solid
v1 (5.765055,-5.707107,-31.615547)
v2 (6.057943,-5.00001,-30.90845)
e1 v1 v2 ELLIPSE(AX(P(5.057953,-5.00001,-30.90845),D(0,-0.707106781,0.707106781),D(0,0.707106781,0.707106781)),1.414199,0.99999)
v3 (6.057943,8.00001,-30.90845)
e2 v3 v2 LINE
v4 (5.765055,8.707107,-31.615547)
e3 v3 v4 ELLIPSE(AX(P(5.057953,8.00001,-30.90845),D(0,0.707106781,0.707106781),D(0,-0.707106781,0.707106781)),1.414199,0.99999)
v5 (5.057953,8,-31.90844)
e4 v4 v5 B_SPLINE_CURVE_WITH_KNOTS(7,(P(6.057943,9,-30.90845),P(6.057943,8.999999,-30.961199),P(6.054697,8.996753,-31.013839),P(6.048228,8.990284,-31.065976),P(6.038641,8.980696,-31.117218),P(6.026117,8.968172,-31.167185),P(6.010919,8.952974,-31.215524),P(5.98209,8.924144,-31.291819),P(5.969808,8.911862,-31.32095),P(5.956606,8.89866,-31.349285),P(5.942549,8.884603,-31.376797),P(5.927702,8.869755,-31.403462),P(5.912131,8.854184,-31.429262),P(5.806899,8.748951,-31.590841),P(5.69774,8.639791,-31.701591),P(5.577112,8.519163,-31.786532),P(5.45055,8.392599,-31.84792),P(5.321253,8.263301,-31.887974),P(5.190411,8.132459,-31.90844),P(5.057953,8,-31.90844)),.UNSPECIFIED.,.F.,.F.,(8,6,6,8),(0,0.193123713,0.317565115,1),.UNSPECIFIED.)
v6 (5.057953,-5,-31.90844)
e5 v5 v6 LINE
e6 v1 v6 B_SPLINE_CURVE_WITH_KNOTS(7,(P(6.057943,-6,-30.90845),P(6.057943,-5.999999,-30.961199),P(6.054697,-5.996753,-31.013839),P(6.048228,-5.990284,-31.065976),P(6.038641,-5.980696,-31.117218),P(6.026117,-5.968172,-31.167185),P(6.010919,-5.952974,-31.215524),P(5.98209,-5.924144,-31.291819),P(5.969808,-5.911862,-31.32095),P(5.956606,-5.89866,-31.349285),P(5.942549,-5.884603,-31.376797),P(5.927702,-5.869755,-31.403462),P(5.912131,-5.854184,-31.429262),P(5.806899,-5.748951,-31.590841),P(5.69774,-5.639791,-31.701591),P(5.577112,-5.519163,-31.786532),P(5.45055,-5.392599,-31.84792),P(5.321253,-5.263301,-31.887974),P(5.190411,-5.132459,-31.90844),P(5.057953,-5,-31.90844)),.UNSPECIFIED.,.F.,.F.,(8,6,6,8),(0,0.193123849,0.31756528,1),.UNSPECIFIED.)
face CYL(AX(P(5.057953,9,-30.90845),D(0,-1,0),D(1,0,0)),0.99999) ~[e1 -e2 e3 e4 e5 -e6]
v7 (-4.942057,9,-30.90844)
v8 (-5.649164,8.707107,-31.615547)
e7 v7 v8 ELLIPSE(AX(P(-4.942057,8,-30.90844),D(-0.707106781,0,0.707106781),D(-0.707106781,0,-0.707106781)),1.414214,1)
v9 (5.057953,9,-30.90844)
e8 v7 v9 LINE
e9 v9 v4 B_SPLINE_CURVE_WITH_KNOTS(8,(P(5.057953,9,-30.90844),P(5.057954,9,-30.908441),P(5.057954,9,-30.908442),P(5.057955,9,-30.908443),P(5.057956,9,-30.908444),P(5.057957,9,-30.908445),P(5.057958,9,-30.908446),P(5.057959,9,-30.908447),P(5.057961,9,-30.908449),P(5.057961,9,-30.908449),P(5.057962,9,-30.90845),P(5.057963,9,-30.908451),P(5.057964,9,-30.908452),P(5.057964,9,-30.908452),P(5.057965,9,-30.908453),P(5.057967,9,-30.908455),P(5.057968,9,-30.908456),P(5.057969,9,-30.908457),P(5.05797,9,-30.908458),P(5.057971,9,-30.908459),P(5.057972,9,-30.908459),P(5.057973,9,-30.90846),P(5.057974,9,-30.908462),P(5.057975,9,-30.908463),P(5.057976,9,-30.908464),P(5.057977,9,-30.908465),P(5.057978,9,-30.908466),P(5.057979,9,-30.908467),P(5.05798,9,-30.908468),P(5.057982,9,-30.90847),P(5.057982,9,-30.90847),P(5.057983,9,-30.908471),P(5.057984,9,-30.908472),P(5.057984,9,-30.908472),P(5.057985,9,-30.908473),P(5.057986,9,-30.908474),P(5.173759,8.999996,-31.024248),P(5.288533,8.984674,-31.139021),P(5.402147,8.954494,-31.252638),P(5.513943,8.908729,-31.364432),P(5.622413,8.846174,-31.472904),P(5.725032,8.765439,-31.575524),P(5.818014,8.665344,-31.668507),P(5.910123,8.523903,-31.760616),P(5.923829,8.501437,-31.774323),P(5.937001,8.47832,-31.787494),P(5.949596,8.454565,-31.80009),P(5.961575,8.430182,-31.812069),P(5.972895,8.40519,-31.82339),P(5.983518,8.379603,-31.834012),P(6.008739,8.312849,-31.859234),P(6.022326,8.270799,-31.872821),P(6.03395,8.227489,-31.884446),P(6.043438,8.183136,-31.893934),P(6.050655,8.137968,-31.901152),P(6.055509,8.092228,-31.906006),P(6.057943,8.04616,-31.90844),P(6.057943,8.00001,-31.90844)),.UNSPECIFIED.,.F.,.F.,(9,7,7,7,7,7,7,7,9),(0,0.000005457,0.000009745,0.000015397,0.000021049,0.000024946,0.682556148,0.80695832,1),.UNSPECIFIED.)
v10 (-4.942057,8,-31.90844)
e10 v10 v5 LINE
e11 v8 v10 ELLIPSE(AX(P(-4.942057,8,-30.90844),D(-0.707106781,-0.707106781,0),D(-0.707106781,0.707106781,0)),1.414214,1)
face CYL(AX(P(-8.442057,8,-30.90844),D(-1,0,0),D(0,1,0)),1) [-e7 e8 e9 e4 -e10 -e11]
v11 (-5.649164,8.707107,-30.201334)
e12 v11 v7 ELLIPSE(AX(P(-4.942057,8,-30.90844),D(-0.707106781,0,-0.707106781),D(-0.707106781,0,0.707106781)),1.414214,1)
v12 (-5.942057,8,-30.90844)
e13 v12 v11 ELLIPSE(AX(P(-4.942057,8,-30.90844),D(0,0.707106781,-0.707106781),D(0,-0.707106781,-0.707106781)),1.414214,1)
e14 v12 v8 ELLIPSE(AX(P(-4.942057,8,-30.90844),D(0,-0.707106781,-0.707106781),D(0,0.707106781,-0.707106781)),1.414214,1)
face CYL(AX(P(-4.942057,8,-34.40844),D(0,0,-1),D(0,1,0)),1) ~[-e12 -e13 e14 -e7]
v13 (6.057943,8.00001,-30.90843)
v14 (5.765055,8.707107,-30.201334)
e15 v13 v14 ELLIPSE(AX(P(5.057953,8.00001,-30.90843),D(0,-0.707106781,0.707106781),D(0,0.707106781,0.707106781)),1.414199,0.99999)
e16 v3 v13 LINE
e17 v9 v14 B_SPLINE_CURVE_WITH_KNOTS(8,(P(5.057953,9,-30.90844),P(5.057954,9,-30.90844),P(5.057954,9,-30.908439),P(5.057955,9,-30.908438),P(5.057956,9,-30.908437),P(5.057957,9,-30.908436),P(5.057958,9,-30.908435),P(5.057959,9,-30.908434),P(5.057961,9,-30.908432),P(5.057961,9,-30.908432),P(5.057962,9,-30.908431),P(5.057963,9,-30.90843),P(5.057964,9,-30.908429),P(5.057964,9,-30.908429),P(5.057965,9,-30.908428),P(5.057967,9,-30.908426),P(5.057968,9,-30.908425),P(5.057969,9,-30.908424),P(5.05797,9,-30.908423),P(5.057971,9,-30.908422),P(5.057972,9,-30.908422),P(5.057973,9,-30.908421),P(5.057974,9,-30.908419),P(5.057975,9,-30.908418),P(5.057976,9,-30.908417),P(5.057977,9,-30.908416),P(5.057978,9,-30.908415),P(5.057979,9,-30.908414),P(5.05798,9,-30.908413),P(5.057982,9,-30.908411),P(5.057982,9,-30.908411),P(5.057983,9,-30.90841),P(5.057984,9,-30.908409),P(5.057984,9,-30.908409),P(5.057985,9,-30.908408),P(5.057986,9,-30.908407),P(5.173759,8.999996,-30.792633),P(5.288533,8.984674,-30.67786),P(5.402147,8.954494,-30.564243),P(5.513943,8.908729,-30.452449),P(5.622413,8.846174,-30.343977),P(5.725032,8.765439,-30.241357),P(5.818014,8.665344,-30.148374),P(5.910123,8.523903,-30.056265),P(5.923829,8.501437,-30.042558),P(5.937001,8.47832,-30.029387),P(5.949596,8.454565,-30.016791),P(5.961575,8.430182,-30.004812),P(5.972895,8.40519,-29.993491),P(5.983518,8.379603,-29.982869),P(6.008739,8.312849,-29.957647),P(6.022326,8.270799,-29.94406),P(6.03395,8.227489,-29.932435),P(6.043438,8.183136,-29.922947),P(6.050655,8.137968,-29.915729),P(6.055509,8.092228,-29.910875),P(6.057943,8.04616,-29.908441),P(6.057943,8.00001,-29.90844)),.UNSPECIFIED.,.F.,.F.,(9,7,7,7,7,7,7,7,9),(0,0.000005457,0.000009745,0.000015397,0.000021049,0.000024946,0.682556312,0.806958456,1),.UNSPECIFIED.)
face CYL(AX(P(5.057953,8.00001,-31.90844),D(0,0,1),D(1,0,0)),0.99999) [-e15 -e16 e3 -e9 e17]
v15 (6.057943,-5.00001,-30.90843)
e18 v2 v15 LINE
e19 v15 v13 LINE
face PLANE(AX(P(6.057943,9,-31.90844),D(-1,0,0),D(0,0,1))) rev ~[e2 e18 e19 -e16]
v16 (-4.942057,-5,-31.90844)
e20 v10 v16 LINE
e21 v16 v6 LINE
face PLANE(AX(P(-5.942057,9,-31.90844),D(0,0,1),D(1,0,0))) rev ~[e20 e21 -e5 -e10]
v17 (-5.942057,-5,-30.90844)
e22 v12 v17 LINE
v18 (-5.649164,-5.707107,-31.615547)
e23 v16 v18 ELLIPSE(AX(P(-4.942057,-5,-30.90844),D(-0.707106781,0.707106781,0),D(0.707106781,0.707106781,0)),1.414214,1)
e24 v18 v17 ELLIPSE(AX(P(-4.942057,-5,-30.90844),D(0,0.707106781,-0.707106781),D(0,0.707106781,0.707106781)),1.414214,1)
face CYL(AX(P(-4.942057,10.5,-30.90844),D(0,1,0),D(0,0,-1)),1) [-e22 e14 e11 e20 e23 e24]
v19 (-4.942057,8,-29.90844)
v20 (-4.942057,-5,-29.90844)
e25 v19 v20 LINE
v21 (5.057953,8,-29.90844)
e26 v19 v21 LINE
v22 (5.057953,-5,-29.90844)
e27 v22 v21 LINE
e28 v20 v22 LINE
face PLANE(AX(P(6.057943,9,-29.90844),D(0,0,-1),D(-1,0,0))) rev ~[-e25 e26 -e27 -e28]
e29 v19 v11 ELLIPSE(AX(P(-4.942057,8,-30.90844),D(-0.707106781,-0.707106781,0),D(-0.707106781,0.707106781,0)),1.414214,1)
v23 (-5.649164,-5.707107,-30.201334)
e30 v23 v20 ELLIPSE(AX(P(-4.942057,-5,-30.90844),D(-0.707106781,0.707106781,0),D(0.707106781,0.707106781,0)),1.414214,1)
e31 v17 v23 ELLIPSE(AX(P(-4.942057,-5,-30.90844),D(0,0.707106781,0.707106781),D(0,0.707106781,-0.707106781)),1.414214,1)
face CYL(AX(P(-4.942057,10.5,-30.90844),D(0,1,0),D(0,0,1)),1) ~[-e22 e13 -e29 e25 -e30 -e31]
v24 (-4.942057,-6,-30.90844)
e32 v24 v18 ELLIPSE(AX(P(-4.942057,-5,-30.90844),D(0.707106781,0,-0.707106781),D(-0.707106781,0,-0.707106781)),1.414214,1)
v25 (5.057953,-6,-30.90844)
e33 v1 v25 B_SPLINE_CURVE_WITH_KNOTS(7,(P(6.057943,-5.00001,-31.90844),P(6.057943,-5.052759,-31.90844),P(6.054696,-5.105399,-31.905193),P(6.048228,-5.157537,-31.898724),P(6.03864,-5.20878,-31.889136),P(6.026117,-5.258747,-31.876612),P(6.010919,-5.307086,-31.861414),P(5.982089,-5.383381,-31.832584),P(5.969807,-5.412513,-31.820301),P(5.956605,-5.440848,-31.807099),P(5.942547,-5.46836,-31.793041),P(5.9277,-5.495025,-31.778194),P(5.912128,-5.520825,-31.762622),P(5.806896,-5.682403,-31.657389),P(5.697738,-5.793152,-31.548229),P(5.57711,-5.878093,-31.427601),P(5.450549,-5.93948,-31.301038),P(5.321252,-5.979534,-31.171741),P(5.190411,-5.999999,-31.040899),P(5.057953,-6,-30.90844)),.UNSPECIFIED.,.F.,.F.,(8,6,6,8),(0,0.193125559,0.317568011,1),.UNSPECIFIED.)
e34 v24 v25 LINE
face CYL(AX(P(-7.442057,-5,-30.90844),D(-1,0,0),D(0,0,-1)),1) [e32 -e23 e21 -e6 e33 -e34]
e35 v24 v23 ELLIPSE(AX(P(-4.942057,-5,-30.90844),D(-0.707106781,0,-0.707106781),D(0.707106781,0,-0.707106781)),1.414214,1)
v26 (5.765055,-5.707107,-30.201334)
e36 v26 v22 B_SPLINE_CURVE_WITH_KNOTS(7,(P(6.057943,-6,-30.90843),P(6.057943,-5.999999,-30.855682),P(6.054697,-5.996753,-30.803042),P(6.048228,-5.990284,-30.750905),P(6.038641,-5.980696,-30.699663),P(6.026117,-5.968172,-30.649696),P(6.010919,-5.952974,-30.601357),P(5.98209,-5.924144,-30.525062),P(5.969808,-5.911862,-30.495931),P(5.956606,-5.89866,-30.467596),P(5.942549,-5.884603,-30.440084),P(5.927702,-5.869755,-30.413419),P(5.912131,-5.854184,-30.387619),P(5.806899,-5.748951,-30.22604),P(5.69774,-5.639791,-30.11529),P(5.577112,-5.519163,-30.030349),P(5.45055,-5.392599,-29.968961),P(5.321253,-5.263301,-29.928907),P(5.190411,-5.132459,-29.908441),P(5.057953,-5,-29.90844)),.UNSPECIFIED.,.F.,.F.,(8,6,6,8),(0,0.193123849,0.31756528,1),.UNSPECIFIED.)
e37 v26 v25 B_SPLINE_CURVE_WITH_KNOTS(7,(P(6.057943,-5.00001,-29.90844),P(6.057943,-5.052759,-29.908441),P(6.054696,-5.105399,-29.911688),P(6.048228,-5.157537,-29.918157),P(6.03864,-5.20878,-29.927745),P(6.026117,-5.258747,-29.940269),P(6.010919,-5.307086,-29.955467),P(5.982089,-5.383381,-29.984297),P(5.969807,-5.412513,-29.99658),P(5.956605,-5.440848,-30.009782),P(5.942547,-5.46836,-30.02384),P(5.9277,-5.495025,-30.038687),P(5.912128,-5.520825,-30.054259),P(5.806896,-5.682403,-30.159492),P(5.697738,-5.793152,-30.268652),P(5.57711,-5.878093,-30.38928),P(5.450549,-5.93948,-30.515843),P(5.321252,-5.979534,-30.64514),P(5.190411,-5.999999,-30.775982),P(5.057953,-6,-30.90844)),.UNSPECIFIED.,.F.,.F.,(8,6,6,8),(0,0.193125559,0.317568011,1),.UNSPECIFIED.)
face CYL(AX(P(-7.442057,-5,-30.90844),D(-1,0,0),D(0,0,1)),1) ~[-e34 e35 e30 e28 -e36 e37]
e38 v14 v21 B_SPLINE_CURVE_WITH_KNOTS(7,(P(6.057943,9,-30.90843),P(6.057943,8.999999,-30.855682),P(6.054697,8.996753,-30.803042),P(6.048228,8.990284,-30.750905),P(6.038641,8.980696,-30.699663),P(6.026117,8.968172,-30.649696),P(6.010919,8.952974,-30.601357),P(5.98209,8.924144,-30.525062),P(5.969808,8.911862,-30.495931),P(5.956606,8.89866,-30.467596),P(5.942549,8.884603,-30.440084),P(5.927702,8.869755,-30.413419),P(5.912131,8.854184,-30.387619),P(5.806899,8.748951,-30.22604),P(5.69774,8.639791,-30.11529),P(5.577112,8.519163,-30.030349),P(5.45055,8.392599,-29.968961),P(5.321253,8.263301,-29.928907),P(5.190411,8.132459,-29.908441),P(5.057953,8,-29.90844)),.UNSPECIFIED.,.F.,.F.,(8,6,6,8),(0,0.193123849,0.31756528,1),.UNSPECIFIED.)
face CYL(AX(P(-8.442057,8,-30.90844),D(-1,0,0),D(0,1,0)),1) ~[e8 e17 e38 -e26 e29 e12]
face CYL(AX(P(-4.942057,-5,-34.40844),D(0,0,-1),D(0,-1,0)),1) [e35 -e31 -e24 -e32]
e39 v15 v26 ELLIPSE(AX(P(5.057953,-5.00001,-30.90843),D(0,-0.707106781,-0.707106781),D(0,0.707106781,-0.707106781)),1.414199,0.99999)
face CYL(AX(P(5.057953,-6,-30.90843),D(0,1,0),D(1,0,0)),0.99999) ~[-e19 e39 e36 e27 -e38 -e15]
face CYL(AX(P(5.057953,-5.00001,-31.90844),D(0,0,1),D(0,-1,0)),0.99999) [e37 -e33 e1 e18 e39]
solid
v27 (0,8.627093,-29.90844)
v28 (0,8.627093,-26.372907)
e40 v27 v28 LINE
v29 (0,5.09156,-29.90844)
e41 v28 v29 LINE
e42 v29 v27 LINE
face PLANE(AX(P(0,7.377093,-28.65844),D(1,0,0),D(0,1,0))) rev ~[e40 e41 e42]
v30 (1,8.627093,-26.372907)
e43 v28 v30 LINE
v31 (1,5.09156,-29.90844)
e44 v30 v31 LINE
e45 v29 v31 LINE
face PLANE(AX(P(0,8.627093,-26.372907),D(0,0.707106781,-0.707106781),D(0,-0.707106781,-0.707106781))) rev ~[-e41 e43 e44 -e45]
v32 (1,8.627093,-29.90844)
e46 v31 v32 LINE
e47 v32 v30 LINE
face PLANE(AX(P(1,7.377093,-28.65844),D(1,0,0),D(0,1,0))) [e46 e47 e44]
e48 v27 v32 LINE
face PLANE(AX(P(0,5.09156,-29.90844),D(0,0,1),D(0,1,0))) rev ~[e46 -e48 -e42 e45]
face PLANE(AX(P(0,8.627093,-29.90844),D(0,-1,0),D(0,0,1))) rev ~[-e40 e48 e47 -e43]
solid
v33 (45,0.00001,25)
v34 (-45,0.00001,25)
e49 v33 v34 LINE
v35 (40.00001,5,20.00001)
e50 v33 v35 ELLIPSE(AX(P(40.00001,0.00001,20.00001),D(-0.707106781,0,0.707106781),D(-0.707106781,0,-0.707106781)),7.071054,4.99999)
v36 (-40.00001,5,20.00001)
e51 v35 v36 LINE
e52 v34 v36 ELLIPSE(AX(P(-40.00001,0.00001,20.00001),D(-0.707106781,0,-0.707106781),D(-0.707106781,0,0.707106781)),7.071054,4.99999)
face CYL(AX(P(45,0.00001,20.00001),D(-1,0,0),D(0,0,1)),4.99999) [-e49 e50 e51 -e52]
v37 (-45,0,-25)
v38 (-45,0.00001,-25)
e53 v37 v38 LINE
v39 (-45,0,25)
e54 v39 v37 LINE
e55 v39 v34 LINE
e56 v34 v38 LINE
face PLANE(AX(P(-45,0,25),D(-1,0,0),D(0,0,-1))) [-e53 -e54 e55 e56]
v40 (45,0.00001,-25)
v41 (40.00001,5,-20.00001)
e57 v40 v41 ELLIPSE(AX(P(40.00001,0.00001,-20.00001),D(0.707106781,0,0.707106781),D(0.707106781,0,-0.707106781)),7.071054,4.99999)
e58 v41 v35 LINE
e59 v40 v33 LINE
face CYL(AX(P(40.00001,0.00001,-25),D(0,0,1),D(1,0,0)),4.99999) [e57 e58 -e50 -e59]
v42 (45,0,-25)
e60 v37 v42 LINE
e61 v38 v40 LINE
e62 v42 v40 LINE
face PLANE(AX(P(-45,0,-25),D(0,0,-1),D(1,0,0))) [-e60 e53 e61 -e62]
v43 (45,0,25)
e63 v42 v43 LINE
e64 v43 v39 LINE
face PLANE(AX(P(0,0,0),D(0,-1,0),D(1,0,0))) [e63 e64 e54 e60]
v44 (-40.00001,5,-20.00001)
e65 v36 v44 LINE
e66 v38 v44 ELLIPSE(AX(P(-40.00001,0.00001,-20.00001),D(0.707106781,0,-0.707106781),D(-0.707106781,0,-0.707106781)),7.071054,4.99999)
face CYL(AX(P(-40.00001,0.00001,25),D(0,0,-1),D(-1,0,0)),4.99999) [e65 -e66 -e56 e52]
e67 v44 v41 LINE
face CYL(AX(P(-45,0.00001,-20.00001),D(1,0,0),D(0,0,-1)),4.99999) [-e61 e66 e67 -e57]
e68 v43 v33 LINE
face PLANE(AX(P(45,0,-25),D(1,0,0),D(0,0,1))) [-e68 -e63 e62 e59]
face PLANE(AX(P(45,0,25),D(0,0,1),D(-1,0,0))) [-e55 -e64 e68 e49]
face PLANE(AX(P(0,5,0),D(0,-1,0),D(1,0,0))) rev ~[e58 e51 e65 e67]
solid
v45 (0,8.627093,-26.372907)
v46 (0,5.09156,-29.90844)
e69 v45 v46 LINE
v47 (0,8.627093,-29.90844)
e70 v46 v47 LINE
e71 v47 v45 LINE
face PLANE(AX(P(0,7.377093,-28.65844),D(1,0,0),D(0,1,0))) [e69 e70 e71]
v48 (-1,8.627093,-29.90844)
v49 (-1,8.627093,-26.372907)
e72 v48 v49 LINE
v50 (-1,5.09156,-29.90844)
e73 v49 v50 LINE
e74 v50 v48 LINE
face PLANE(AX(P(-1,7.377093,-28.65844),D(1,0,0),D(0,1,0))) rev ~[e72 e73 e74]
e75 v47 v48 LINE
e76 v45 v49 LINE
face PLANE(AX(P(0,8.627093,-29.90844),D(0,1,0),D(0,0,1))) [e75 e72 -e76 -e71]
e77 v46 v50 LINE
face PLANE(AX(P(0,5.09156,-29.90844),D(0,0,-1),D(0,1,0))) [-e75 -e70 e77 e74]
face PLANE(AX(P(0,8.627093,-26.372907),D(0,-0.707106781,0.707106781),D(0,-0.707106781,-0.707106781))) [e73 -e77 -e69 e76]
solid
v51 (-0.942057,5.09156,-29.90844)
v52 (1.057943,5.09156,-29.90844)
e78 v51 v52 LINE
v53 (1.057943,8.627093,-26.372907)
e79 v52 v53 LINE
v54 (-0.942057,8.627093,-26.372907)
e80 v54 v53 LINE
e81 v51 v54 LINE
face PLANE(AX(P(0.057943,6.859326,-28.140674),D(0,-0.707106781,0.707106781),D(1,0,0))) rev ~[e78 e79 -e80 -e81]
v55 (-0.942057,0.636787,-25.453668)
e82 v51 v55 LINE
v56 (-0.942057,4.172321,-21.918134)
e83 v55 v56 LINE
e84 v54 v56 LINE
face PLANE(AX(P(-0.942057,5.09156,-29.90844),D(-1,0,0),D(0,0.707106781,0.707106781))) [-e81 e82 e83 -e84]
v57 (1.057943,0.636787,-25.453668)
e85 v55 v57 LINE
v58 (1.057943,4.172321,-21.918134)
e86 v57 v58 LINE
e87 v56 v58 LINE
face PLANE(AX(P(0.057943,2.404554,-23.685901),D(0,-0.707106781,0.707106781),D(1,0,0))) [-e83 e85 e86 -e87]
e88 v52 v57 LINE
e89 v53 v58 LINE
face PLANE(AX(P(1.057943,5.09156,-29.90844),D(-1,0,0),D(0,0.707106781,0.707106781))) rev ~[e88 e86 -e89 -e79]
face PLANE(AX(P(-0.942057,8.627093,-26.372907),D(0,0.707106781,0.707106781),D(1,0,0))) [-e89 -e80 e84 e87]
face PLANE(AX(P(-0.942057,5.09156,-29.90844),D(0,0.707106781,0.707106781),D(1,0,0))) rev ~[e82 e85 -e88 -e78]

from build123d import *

# Parameters (mm, degrees)
F1_DEPTH     = 5
F3_DEPTH     = 15
F4_R         = 4.99999
F6_W         = 2
F6_H         = 5
F7_DEPTH     = 6.3
F10_DEPTH    = 9
F12_DEPTH    = 1
F13_DEPTH    = 1
F14_DEPTH    = 15
F15_R        = 0.99999
F16_T1_DEPTH = 16.00001
F16_T3_DEPTH = 7
F17_T1_DEPTH = 19
F17_T3_DEPTH = 7
F18_T1_DEPTH = 15.00001


# Not quite as in the source:
# - a fillet or chamfer that OpenCascade refuses, or shapes differently, is made with other operations: its cross-section is extruded or revolved along the edge and cut away or added
# - a fillet or chamfer is up to 0.001 mm smaller than in the source, because OpenCascade refuses the exact size


with BuildPart() as f1:
    # F0 (on Front) → F1 (new body)
    with BuildSketch(Plane.XZ):
        Polygon((45, 25), (-45, 25), (-45, -25), (-2.5, -25), (0, -25), (2.5, -25), (45, -25), align=None)
    extrude(amount=-F1_DEPTH)

    # F4 (radius 5 in the source; OpenCascade refuses exactly that, so slightly less here)
    f4_edges = [f1.edges().sort_by_distance(p)[0] for p in [
        (0, 5, 25),
        (-45, 5, 0),
        (0, 5, -25),
        (45, 5, 0),
    ]]
    fillet(f4_edges, radius=F4_R)


with BuildPart() as f3:
    # F2 (on face) → F3 (new body)
    with BuildSketch(Plane(origin=(0, 5, 0), x_dir=(-1, 0, 0), z_dir=(0, 1, 0))):
        Polygon((2.5, -30), (-2.5, -30), (-8.5, -30), (-8.5, -33), (8.5, -33), (8.5, -30), align=None)
    extrude(amount=-F3_DEPTH)


with BuildPart() as f7:
    # F6 (on face) → F7 (new body)
    with BuildSketch(Plane(origin=(0, 17.5, -17.5), x_dir=(1, 0, 0), z_dir=(0, -0.7071067812, 0.7071067812))):
        with Locations((0.0579425832, -15.0481848419)):
            Rectangle(F6_W, F6_H)
    extrude(amount=F7_DEPTH)


with BuildPart() as f10:
    # F9 (on Front) → F10 (new body)
    with BuildSketch(Plane.XZ):
        Polygon((1.0579425832, -29.9084404992), (-0.9420574168, -29.9084404992), (-5.9420574168, -29.9084404992), (-5.9420574168, -31.9084404992), (6.0579425832, -31.9084404992), (6.0579425832, -29.9084404992), align=None)
    extrude(amount=-F10_DEPTH)

    # F14 (add): a face of the model
    f14_faces = [f10.faces().sort_by_distance(p)[0] for p in [
        (0.0579425832, 9, -30.9084404992),
    ]]
    extrude(f14_faces, amount=-F14_DEPTH)

    # F15 (radius 1 in the source; OpenCascade refuses exactly that, so slightly less here)
    f15_edges = [f10.edges().sort_by_distance(p)[0] for p in [
        (6.057943, 9, -30.90844),
        (6.057943, 1.5, -29.90844),
        (6.057943, -6, -30.90844),
        (6.057943, 1.5, -31.90844),
    ]]
    fillet(f15_edges, radius=F15_R)

    # F16: fillet of radius 1 on 4 edges, made by hand

    # F16_s2 → F16_t1 (cut)
    with BuildSketch(Plane.YZ.offset(-8.4420574168)):
        with BuildLine():
            ThreePointArc((9, -30.9084404992), (8.7071067812, -30.201333718), (8, -29.9084404992))
            Line((8, -29.9084404992), (9, -29.9084404992))
            Line((9, -29.9084404992), (9, -30.9084404992))
        make_face()
        with BuildLine():
            ThreePointArc((9, -30.9084404992), (8.7071067812, -31.6155472804), (8, -31.9084404992))
            Line((8, -31.9084404992), (9, -31.9084404992))
            Line((9, -31.9084404992), (9, -30.9084404992))
        make_face()
    extrude(amount=F16_T1_DEPTH, mode=Mode.SUBTRACT)

    # F16_s4 → F16_t3 (cut)
    with BuildSketch(Plane.XY.offset(-34.4084404992)):
        with BuildLine():
            ThreePointArc((-4.9420574168, 9), (-5.649164198, 8.7071067812), (-5.9420574168, 8))
            Line((-5.9420574168, 8), (-5.9420574168, 9))
            Line((-5.9420574168, 9), (-4.9420574168, 9))
        make_face()
    extrude(amount=F16_T3_DEPTH, mode=Mode.SUBTRACT)

    # F17: fillet of radius 1 on 4 edges, made by hand

    # F17_s2 → F17_t1 (cut)
    with BuildSketch(Plane.XZ.offset(-10.5)):
        with BuildLine():
            ThreePointArc((-4.9420574168, -29.9084404992), (-5.649164198, -30.201333718), (-5.9420574168, -30.9084404992))
            Line((-5.9420574168, -30.9084404992), (-5.9420574168, -29.9084404992))
            Line((-5.9420574168, -29.9084404992), (-4.9420574168, -29.9084404992))
        make_face()
        with BuildLine():
            ThreePointArc((-4.9420574168, -31.9084404992), (-5.649164198, -31.6155472804), (-5.9420574168, -30.9084404992))
            Line((-5.9420574168, -30.9084404992), (-5.9420574168, -31.9084404992))
            Line((-5.9420574168, -31.9084404992), (-4.9420574168, -31.9084404992))
        make_face()
    extrude(amount=F17_T1_DEPTH, mode=Mode.SUBTRACT)

    # F17_s4 → F17_t3 (cut)
    with BuildSketch(Plane.XY.offset(-34.4084404992)):
        with BuildLine():
            ThreePointArc((-4.9420574168, -6), (-5.649164198, -5.7071067812), (-5.9420574168, -5))
            Line((-5.9420574168, -5), (-5.9420574168, -6))
            Line((-5.9420574168, -6), (-4.9420574168, -6))
        make_face()
    extrude(amount=F17_T3_DEPTH, mode=Mode.SUBTRACT)

    # F18: fillet of radius 1 on 4 edges, made by hand

    # F18_s2 → F18_t1 (cut)
    with BuildSketch(Plane.YZ.offset(-7.4420574168)):
        with BuildLine():
            ThreePointArc((-5, -31.9084404992), (-5.7071067812, -31.6155472804), (-6, -30.9084404992))
            Line((-6, -30.9084404992), (-6, -31.9084404992))
            Line((-6, -31.9084404992), (-5, -31.9084404992))
        make_face()
        with BuildLine():
            ThreePointArc((-5, -29.9084404992), (-5.7071067812, -30.201333718), (-6, -30.9084404992))
            Line((-6, -30.9084404992), (-6, -29.9084404992))
            Line((-6, -29.9084404992), (-5, -29.9084404992))
        make_face()
    extrude(amount=F18_T1_DEPTH, mode=Mode.SUBTRACT)


with BuildPart() as f12:
    # F11 (on Right) → F12 (new body)
    with BuildSketch(Plane.YZ):
        Polygon((8.6270934067, -29.9084404992), (8.6270934067, -26.3729065933), (5.0915595008, -29.9084404992), align=None)
    extrude(amount=F12_DEPTH)


with BuildPart() as f13:
    # F13 (new): a face of the model
    f13_faces = [f12.part.faces().sort_by_distance(p)[0] for p in [
        (0, 7.4485821048, -28.7299291972),
    ]]
    extrude(f13_faces, amount=F13_DEPTH)


solid = Compound([f1.part, f7.part, f10.part, f12.part, f13.part])
